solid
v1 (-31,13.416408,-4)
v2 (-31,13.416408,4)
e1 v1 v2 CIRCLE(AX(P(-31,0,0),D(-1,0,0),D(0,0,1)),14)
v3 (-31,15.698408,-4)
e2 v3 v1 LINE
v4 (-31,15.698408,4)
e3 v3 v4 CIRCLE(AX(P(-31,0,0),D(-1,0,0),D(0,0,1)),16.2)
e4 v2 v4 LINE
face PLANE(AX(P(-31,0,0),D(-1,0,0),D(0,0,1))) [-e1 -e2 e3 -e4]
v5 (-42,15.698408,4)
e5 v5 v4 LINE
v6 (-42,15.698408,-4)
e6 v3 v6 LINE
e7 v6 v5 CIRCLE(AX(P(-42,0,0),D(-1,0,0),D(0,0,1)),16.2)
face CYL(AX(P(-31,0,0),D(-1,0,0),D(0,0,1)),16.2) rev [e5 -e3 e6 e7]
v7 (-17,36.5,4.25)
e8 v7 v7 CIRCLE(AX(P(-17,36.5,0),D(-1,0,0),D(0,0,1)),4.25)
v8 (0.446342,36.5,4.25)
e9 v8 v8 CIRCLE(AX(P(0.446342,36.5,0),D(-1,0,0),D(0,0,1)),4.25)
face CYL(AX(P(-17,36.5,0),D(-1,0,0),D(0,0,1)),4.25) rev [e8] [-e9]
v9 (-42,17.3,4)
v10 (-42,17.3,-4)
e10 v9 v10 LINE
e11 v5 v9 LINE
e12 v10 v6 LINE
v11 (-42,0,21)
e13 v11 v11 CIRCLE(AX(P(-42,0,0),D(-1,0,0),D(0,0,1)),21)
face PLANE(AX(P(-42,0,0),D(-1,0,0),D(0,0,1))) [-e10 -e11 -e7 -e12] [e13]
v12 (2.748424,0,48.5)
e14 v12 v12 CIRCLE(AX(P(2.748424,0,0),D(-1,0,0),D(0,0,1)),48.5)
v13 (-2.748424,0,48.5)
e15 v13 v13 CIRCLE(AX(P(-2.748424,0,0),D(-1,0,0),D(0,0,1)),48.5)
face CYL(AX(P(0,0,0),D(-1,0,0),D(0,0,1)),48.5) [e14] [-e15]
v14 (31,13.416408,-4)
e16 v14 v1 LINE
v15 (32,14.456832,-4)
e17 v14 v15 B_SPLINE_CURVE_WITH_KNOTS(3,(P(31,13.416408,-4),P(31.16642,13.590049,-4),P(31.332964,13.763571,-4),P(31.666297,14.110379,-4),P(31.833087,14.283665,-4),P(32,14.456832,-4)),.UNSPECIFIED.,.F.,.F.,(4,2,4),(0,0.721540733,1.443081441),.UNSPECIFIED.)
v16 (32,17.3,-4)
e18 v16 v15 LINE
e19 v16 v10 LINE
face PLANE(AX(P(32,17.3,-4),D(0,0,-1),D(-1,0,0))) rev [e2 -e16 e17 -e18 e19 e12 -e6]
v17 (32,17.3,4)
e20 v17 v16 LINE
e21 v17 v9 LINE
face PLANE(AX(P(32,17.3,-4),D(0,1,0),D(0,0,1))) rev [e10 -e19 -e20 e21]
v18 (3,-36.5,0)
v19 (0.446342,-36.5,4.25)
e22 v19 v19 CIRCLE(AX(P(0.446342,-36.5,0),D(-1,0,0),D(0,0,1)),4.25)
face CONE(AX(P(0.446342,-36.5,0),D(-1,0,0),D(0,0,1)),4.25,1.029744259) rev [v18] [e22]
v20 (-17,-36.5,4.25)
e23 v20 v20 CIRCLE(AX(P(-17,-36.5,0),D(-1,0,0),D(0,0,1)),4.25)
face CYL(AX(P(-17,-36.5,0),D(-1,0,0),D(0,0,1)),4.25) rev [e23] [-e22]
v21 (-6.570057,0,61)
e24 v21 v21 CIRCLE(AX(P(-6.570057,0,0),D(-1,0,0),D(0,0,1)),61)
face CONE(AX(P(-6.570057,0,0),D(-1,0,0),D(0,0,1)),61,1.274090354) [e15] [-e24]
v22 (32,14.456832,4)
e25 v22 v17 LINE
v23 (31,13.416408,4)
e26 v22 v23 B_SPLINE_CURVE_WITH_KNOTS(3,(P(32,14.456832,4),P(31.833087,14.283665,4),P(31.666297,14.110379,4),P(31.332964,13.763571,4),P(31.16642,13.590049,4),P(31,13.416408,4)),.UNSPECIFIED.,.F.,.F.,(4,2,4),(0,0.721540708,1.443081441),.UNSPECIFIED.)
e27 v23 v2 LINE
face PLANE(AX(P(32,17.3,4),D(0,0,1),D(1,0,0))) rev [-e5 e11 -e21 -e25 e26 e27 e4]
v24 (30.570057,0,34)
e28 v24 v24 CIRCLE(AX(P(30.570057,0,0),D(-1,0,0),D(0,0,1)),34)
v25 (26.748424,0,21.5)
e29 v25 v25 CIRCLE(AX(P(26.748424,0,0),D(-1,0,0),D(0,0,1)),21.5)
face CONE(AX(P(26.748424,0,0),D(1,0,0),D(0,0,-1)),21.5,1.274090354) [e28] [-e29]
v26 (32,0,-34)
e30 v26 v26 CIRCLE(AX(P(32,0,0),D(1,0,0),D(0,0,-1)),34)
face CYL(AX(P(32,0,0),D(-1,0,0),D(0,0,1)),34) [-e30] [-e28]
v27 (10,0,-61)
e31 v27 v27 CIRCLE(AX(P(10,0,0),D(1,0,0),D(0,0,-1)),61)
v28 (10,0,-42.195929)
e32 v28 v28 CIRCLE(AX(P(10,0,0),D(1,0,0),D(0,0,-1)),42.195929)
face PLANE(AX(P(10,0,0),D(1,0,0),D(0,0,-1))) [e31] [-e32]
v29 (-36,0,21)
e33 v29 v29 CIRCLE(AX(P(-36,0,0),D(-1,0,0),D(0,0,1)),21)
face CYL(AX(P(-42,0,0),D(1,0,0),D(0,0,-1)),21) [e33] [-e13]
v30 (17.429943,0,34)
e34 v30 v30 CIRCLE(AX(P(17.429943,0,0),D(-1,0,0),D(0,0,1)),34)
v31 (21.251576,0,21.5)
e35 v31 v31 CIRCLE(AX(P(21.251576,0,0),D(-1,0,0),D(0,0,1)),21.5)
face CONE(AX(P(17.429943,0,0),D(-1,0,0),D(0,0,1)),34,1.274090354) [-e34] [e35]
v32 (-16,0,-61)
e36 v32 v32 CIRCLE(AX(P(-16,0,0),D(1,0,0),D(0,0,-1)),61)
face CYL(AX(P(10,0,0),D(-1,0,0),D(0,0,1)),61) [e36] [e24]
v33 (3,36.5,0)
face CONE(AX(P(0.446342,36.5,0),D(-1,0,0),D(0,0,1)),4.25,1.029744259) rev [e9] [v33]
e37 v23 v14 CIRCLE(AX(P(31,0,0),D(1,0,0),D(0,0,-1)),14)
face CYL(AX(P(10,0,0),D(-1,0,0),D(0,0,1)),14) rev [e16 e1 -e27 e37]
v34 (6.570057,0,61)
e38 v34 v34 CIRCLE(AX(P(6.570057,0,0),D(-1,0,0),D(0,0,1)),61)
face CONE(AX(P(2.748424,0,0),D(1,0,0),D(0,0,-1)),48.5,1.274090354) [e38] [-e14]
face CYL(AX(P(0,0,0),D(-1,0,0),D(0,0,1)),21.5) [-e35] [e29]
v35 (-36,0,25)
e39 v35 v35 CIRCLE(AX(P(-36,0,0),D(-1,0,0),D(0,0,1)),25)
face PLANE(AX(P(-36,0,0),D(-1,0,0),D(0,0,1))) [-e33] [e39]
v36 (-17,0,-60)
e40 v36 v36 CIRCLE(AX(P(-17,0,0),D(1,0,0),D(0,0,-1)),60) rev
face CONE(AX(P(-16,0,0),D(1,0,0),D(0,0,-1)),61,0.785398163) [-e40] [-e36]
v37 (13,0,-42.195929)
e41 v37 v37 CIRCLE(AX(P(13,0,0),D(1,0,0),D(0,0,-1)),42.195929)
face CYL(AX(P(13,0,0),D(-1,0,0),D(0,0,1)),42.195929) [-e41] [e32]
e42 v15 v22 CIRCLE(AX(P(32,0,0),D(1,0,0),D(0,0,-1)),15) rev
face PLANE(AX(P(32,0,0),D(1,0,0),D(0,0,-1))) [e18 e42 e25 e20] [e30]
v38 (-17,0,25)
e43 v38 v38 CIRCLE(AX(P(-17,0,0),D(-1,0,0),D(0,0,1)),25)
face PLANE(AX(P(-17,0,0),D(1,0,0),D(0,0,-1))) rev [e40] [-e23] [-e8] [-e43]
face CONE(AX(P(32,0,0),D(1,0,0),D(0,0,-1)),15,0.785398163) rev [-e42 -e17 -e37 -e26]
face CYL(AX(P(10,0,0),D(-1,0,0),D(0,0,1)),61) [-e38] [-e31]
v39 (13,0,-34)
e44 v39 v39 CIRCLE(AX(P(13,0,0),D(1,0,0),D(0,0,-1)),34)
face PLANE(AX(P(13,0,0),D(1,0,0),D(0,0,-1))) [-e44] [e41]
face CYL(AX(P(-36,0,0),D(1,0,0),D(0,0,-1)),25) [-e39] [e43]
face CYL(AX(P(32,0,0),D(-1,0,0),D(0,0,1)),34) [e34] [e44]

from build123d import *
from build123d.topology import SkipClean

# Parameters (mm, degrees)
EXTRUDE_1_DEPTH         = 10
EXTRUDE_1_DEPTH_BACK    = 17
SKETCH_1_R              = 61
SKETCH_3_R              = 25
EXTRUDE_2_DEPTH         = 19
SKETCH_4_R              = 21
EXTRUDE_3_DEPTH         = 6
SKETCH_5_R              = 16.2
CUT_EXTRUDE_1_DEPTH     = 11
SKETCH_6_R              = 14
CUT_EXTRUDE_2_DEPTH     = 96.514396821
HOLE_WIZARD_M10_1_D     = 8.5
HOLE_WIZARD_M10_1_DEPTH = 17.446342369
HOLE_WIZARD_M10_1_TIP   = 2.553657631
SKETCH_10_R             = 42.19592905
UNDEF_DEPTH             = 3
SKETCH_11_R             = 34
EXTRUDE_5_DEPTH         = 19
CUT_EXTRUDE_3_DEPTH     = 114.657379875
CHAMFER_1_SIZE          = 1


with BuildPart() as part:
    # 草图1 → 凸台-拉伸1 (new, two sides: drawn at the far end of the back side and taken through both)
    with BuildSketch(Plane(origin=(0, 0, 0), x_dir=(0, 0, -1), z_dir=(1, 0, 0)).offset(-EXTRUDE_1_DEPTH_BACK)):
        Circle(SKETCH_1_R)
    extrude(amount=EXTRUDE_1_DEPTH + EXTRUDE_1_DEPTH_BACK)

    # 草图2 → 切除-旋转1 (revolve, cut)
    with BuildSketch(Plane(origin=(0, 0, 0), x_dir=(1, 0, 0), z_dir=(0, 1, 0))):
        Polygon((-6.570057385, 61), (-2.748423867, 48.5), (2.748423867, 48.5), (6.570057385, 61), align=None)
    revolve(axis=Axis((0, 0, 0), (1, 0, 0)), mode=Mode.SUBTRACT)

    # 草图3 → 凸台-拉伸2 (add)
    with BuildSketch(Plane.ZY.offset(17)):
        Circle(SKETCH_3_R)
    extrude(amount=EXTRUDE_2_DEPTH)

    # 草图4 → 凸台-拉伸3 (add)
    with BuildSketch(Plane.ZY.offset(36)):
        Circle(SKETCH_4_R)
    extrude(amount=EXTRUDE_3_DEPTH)

    # 草图5 → 切除-拉伸1 (cut)
    with BuildSketch(Plane.ZY.offset(42)):
        Circle(SKETCH_5_R)
    extrude(amount=-CUT_EXTRUDE_1_DEPTH, mode=Mode.SUBTRACT)

    # 草图6 → 切除-拉伸2 (cut, through all)
    with BuildSketch(Plane.ZY.offset(31)):
        Circle(SKETCH_6_R)
    extrude(amount=-CUT_EXTRUDE_2_DEPTH, mode=Mode.SUBTRACT)

    # M10 螺纹孔1
    with Locations(Plane.ZY.offset(17)):
        with Locations((0, -36.5), (0, 36.5)):
            Hole(HOLE_WIZARD_M10_1_D / 2, depth=HOLE_WIZARD_M10_1_DEPTH)
            with Locations((0, 0, -(HOLE_WIZARD_M10_1_DEPTH + HOLE_WIZARD_M10_1_TIP / 2))):  # 118° drill point
                Cone(0, HOLE_WIZARD_M10_1_D / 2, HOLE_WIZARD_M10_1_TIP, mode=Mode.SUBTRACT)

    # 草图10 → undef (add)
    with BuildSketch(Plane(origin=(10, 0, 0), x_dir=(0, 0, -1), z_dir=(1, 0, 0))):
        Circle(SKETCH_10_R)
    extrude(amount=UNDEF_DEPTH)

    # 草图11 → 凸台-拉伸5 (add)
    with BuildSketch(Plane(origin=(13, 0, 0), x_dir=(0, 0, -1), z_dir=(1, 0, 0))):
        Circle(SKETCH_11_R)
    extrude(amount=EXTRUDE_5_DEPTH)

    # 草图12 → 切除-旋转2 (revolve, cut)
    with BuildSketch(Plane.XY):
        Polygon((21.251576133, 21.5), (26.748423867, 21.5), (30.570057385, 34), (17.429942615, 34), align=None)
    revolve(axis=Axis((0, 0, 0), (1, 0, 0)), mode=Mode.SUBTRACT)

    # 草图7 → 切除-拉伸3 (cut, through all)
    with SkipClean():  # the faces are left unmerged after this step: merging them gives an invalid solid
        with BuildSketch(Plane.ZY.offset(42)):
            with BuildLine():
                Line((-4, 17.3), (4, 17.3))
                Line((4, 17.3), (4, 13.416407865))
                ThreePointArc((4, 13.416407865), (0, -14), (-4, 13.416407865))
                Line((-4, 13.416407865), (-4, 17.3))
            make_face()
        extrude(amount=-CUT_EXTRUDE_3_DEPTH, mode=Mode.SUBTRACT)
    add(part.part.scale(1), mode=Mode.REPLACE)  # the faces are merged on a copy

    # 倒角1
    chamfer_1_edges = [part.edges().sort_by_distance(p)[0] for p in [
        (32, -14, 0),
        (-17, 0, 61),
    ]]
    chamfer(chamfer_1_edges, length=CHAMFER_1_SIZE)


solid = part.part
